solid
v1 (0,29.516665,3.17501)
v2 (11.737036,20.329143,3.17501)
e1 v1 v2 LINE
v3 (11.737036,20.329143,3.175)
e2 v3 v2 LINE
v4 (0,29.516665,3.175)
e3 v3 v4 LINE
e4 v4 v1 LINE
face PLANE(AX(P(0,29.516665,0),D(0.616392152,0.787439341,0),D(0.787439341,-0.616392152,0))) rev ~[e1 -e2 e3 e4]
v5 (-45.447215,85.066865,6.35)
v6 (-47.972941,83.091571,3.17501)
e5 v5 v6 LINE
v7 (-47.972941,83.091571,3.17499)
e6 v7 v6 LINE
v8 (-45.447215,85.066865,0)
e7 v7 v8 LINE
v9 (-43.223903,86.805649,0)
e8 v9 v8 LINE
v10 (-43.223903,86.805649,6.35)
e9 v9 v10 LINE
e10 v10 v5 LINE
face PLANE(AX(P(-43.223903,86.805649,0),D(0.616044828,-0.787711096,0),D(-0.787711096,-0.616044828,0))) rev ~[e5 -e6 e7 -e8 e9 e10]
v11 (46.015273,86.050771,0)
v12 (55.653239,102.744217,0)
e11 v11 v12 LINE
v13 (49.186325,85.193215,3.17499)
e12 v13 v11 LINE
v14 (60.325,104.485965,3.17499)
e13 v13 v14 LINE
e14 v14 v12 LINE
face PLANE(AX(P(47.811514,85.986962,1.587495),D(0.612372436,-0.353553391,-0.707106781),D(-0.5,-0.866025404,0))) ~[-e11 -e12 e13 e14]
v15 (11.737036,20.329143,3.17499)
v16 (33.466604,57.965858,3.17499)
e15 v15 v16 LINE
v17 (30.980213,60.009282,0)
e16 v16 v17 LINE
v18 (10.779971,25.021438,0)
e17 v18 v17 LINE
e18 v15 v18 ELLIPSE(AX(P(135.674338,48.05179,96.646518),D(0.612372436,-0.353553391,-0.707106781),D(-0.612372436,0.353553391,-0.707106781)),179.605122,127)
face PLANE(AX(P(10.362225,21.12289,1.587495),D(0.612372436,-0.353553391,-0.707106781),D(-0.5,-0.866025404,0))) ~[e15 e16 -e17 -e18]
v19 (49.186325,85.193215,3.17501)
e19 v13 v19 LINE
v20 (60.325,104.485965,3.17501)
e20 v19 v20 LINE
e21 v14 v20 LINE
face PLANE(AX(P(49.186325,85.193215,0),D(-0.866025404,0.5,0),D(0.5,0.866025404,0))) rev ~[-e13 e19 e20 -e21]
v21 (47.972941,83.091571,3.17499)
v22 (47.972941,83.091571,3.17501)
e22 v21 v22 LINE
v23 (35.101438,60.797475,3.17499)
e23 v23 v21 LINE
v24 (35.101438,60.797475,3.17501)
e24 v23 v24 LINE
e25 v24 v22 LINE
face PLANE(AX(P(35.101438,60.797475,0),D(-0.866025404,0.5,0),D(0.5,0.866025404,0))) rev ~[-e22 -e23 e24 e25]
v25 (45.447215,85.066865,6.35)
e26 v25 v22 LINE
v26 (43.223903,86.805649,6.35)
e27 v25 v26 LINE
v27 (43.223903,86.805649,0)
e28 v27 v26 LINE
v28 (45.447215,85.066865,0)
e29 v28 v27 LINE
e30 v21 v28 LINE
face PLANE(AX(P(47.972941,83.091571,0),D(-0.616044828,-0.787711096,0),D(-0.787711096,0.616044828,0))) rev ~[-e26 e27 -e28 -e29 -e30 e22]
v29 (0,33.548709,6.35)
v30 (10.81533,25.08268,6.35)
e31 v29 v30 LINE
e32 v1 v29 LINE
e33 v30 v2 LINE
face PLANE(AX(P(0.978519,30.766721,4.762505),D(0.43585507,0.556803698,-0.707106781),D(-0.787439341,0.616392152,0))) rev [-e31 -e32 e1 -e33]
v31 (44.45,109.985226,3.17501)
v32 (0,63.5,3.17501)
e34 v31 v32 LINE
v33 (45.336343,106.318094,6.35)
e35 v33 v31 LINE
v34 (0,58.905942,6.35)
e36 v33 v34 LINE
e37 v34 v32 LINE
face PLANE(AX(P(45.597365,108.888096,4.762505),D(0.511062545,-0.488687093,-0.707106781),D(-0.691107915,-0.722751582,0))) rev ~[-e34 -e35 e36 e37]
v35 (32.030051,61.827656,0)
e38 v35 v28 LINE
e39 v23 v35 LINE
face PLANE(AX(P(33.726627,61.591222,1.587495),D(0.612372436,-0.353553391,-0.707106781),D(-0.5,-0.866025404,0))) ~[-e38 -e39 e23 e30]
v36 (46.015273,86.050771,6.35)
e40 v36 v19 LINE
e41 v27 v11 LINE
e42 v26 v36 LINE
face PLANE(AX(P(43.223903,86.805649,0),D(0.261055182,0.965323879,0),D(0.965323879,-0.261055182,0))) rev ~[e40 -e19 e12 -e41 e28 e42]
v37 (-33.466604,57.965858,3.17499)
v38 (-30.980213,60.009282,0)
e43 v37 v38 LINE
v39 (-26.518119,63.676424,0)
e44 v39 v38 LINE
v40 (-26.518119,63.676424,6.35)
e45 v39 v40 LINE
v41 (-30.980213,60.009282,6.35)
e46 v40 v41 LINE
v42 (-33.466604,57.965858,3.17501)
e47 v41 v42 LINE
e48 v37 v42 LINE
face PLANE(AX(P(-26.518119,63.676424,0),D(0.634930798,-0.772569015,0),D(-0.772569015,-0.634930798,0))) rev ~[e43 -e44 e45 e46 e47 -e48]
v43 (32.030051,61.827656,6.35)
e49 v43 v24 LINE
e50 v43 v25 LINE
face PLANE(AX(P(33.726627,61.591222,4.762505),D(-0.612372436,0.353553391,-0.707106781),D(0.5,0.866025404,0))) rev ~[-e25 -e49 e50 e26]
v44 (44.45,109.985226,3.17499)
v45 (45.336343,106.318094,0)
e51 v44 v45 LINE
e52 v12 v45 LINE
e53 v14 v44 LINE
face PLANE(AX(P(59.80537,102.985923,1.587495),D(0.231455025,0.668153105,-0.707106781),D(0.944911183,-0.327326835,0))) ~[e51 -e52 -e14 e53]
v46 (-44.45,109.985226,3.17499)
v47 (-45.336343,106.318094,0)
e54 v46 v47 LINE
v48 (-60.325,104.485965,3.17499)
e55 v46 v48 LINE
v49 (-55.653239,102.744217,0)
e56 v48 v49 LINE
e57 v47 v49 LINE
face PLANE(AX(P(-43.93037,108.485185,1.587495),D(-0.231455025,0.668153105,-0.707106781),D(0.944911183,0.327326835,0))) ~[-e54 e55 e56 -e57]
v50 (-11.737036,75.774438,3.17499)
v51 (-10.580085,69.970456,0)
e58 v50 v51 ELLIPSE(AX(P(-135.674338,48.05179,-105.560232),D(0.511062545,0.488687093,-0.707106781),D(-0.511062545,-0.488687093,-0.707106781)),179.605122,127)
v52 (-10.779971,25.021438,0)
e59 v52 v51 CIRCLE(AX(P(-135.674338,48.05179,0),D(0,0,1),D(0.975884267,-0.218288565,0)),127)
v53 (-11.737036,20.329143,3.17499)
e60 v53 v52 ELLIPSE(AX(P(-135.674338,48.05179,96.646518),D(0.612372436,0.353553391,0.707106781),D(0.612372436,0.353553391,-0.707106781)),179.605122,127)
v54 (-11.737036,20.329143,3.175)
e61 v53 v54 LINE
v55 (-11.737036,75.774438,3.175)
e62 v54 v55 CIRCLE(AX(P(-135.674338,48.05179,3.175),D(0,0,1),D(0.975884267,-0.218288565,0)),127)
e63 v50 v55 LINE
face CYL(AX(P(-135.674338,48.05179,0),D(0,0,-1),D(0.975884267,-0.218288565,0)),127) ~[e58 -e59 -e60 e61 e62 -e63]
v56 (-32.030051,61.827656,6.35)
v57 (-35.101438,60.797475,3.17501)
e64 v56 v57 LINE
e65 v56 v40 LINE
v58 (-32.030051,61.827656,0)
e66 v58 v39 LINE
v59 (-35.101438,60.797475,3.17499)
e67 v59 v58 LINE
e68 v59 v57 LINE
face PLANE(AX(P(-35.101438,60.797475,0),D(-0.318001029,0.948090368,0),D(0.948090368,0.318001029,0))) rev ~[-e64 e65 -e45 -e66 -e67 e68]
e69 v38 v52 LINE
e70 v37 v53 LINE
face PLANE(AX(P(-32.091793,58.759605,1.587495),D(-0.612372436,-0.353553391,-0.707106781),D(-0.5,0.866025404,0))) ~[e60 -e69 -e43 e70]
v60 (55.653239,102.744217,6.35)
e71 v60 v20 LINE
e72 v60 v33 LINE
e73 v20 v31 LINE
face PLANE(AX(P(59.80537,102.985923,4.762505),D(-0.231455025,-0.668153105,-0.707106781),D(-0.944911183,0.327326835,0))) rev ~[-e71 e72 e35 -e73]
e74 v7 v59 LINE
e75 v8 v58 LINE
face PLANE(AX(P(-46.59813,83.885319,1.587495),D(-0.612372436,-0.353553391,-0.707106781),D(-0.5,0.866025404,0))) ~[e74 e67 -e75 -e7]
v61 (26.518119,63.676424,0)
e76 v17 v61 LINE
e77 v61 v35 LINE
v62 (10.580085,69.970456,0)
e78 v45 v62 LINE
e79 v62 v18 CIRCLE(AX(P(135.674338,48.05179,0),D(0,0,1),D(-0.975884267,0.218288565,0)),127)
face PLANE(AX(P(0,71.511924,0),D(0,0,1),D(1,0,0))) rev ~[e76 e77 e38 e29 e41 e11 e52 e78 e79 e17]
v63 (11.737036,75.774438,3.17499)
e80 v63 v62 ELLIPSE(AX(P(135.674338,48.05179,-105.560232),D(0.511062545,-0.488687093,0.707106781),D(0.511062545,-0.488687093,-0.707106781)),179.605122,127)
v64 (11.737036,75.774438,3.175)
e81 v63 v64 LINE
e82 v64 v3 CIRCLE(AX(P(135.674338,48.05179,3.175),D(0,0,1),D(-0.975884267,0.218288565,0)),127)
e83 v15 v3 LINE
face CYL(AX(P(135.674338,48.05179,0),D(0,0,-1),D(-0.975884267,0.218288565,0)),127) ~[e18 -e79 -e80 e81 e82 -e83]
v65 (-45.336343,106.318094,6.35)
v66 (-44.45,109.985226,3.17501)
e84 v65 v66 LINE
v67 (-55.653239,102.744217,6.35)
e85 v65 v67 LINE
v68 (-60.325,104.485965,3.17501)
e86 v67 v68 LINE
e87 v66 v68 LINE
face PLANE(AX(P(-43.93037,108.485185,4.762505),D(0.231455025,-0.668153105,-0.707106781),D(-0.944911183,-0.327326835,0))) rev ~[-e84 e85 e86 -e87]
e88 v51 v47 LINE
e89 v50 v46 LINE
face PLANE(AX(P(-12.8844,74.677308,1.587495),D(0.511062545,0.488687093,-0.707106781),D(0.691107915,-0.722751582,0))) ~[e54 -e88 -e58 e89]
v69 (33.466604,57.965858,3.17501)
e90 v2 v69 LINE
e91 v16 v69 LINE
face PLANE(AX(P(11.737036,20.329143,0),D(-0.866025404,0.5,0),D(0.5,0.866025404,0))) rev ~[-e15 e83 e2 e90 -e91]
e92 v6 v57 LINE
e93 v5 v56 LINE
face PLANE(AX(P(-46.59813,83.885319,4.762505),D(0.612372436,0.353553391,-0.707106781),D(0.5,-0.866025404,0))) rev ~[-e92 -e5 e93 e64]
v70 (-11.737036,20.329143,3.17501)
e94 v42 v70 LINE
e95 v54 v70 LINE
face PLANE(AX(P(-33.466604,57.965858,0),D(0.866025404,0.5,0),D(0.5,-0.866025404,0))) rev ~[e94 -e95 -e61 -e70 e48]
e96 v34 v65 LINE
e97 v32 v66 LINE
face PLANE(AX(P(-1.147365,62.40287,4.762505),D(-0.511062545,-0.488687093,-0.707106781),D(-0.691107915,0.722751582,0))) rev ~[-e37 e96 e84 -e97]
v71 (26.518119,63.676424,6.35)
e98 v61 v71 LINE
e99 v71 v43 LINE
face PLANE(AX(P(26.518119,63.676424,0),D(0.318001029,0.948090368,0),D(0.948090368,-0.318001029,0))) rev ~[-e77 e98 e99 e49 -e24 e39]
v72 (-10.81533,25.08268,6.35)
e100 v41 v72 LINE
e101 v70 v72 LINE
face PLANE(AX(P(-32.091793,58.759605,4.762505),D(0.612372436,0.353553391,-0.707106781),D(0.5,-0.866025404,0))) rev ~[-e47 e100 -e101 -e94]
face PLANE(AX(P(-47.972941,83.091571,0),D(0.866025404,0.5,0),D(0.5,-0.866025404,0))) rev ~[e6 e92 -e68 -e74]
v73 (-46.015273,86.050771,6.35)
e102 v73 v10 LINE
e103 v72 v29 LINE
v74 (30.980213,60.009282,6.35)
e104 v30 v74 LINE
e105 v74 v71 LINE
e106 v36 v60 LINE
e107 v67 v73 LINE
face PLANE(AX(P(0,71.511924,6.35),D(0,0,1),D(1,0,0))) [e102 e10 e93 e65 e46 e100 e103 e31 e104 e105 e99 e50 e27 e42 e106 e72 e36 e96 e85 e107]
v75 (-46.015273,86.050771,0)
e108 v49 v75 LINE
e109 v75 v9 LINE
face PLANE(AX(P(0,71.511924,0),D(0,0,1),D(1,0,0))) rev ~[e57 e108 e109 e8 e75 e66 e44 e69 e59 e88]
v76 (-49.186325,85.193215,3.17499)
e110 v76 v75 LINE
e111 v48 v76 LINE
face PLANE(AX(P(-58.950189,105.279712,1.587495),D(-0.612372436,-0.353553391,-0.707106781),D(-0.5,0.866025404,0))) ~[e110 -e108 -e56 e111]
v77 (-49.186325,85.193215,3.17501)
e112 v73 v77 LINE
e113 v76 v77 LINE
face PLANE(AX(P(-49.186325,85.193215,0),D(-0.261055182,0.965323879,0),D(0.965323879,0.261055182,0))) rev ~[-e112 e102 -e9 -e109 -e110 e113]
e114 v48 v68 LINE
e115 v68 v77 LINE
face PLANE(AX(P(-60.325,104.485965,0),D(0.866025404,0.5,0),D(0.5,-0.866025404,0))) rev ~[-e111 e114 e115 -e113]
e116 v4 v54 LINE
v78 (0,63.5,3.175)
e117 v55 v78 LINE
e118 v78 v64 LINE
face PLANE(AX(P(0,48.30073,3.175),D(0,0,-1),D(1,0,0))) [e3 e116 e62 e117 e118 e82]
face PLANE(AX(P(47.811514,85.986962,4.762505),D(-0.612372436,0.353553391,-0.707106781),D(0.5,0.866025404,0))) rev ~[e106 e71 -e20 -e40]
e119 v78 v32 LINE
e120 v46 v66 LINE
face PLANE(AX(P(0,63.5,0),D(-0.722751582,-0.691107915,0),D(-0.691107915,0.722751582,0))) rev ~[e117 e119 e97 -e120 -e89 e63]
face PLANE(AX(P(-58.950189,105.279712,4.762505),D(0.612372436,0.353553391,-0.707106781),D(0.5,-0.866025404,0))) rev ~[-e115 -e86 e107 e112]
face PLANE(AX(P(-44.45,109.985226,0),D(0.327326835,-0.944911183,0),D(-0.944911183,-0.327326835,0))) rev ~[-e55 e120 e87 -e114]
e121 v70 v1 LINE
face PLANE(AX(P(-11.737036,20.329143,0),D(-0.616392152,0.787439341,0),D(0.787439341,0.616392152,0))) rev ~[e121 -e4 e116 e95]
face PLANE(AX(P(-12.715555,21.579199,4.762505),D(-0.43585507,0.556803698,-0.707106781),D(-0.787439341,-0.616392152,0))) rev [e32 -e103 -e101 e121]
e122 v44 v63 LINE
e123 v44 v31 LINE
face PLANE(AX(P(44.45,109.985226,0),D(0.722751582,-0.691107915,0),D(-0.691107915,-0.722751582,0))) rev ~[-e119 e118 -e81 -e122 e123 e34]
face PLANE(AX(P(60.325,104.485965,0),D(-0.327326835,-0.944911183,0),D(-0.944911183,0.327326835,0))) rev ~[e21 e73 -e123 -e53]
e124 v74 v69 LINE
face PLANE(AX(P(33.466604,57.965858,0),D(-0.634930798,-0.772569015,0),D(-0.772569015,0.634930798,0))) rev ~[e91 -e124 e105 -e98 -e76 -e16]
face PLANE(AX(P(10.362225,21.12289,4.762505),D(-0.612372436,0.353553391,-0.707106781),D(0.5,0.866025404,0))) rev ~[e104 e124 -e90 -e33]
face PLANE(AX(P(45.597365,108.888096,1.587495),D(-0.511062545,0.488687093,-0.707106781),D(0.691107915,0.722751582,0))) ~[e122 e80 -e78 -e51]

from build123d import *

# Parameters (mm, degrees)
F1_DEPTH = 6.35
F3_DEPTH = 3.175
F4_SIZE  = 3.17499


# Not quite as in the source:
# - a fillet or chamfer is up to 0.001 mm smaller than in the source, because OpenCascade refuses the exact size


with BuildPart() as f1:
    # F0 (on Top) → F1 (new body)
    with BuildSketch(Plane.XY):
        Polygon((-21.1028610796, 36.5512275749), (-11.7370359251, 20.3291425525), (0, 29.516665265), (11.7370359251, 20.3291425525), (33.4666037048, 57.9658579735), (26.5181194991, 63.6764243245), (35.1014384706, 60.7974748498), (47.9729409095, 83.0915710438), (43.2239025831, 86.8056491017), (49.1863254635, 85.1932147405), (60.325, 104.4859649666), (44.45, 109.9852262806), (0, 63.5), (-44.45, 109.9852262806), (-60.325, 104.4859649666), (-49.1863254635, 85.1932147405), (-43.2239025831, 86.8056491017), (-47.9729409095, 83.0915710438), (-35.1014384706, 60.7974748498), (-26.5181194991, 63.6764243245), (-33.4666037048, 57.9658579735), align=None)
    extrude(amount=F1_DEPTH)

    # F2 (on face) → F3 (cut)
    with BuildSketch(Plane(origin=(0, 0, 0), x_dir=(1, 0, 0), z_dir=(0, 0, -1))):
        with BuildLine():
            ThreePointArc((11.7370359251, -75.7744380392), (8.6743378245, -48.0517902958), (11.7370359251, -20.3291425525))
            Line((11.7370359251, -20.3291425525), (0, -29.516665265))
            Line((0, -29.516665265), (-11.7370359251, -20.3291425525))
            ThreePointArc((-11.7370359251, -20.3291425525), (-8.6743378245, -48.0517902958), (-11.7370359251, -75.7744380392))
            Line((-11.7370359251, -75.7744380392), (0, -63.5))
            Line((0, -63.5), (11.7370359251, -75.7744380392))
        make_face()
        Polygon((-11.7370359251, -75.7744380392), (11.7370359251, -75.7744380392), (0, -63.5), align=None)
        Polygon((0, -29.516665265), (11.7370359251, -20.3291425525), (-11.7370359251, -20.3291425525), align=None)
    extrude(amount=-F3_DEPTH, mode=Mode.SUBTRACT)

    # F4 (size 3.175 in the source; OpenCascade refuses exactly that, so slightly less here)
    f4_edges = [f1.edges().sort_by_distance(p)[0] for p in [
        (22.60182, 39.1475, 6.35),
        (22.60182, 39.1475, 0),
        (41.53719, 71.944523, 6.35),
        (41.53719, 71.944523, 0),
        (54.755663, 94.83959, 6.35),
        (54.755663, 94.83959, 0),
        (52.3875, 107.235596, 6.35),
        (52.3875, 107.235596, 0),
        (22.225, 86.742613, 6.35),
        (28.093518, 92.879832, 0),
        (5.868518, 24.922904, 6.35),
        (-5.868518, 24.922904, 6.35),
        (-22.225, 86.742613, 6.35),
        (-28.093518, 92.879832, 0),
        (-52.3875, 107.235596, 6.35),
        (-52.3875, 107.235596, 0),
        (-54.755663, 94.83959, 6.35),
        (-54.755663, 94.83959, 0),
        (-41.53719, 71.944523, 6.35),
        (-41.53719, 71.944523, 0),
        (-22.60182, 39.1475, 6.35),
        (-22.60182, 39.1475, 0),
    ]]
    chamfer(f4_edges, length=F4_SIZE)


solid = f1.part
